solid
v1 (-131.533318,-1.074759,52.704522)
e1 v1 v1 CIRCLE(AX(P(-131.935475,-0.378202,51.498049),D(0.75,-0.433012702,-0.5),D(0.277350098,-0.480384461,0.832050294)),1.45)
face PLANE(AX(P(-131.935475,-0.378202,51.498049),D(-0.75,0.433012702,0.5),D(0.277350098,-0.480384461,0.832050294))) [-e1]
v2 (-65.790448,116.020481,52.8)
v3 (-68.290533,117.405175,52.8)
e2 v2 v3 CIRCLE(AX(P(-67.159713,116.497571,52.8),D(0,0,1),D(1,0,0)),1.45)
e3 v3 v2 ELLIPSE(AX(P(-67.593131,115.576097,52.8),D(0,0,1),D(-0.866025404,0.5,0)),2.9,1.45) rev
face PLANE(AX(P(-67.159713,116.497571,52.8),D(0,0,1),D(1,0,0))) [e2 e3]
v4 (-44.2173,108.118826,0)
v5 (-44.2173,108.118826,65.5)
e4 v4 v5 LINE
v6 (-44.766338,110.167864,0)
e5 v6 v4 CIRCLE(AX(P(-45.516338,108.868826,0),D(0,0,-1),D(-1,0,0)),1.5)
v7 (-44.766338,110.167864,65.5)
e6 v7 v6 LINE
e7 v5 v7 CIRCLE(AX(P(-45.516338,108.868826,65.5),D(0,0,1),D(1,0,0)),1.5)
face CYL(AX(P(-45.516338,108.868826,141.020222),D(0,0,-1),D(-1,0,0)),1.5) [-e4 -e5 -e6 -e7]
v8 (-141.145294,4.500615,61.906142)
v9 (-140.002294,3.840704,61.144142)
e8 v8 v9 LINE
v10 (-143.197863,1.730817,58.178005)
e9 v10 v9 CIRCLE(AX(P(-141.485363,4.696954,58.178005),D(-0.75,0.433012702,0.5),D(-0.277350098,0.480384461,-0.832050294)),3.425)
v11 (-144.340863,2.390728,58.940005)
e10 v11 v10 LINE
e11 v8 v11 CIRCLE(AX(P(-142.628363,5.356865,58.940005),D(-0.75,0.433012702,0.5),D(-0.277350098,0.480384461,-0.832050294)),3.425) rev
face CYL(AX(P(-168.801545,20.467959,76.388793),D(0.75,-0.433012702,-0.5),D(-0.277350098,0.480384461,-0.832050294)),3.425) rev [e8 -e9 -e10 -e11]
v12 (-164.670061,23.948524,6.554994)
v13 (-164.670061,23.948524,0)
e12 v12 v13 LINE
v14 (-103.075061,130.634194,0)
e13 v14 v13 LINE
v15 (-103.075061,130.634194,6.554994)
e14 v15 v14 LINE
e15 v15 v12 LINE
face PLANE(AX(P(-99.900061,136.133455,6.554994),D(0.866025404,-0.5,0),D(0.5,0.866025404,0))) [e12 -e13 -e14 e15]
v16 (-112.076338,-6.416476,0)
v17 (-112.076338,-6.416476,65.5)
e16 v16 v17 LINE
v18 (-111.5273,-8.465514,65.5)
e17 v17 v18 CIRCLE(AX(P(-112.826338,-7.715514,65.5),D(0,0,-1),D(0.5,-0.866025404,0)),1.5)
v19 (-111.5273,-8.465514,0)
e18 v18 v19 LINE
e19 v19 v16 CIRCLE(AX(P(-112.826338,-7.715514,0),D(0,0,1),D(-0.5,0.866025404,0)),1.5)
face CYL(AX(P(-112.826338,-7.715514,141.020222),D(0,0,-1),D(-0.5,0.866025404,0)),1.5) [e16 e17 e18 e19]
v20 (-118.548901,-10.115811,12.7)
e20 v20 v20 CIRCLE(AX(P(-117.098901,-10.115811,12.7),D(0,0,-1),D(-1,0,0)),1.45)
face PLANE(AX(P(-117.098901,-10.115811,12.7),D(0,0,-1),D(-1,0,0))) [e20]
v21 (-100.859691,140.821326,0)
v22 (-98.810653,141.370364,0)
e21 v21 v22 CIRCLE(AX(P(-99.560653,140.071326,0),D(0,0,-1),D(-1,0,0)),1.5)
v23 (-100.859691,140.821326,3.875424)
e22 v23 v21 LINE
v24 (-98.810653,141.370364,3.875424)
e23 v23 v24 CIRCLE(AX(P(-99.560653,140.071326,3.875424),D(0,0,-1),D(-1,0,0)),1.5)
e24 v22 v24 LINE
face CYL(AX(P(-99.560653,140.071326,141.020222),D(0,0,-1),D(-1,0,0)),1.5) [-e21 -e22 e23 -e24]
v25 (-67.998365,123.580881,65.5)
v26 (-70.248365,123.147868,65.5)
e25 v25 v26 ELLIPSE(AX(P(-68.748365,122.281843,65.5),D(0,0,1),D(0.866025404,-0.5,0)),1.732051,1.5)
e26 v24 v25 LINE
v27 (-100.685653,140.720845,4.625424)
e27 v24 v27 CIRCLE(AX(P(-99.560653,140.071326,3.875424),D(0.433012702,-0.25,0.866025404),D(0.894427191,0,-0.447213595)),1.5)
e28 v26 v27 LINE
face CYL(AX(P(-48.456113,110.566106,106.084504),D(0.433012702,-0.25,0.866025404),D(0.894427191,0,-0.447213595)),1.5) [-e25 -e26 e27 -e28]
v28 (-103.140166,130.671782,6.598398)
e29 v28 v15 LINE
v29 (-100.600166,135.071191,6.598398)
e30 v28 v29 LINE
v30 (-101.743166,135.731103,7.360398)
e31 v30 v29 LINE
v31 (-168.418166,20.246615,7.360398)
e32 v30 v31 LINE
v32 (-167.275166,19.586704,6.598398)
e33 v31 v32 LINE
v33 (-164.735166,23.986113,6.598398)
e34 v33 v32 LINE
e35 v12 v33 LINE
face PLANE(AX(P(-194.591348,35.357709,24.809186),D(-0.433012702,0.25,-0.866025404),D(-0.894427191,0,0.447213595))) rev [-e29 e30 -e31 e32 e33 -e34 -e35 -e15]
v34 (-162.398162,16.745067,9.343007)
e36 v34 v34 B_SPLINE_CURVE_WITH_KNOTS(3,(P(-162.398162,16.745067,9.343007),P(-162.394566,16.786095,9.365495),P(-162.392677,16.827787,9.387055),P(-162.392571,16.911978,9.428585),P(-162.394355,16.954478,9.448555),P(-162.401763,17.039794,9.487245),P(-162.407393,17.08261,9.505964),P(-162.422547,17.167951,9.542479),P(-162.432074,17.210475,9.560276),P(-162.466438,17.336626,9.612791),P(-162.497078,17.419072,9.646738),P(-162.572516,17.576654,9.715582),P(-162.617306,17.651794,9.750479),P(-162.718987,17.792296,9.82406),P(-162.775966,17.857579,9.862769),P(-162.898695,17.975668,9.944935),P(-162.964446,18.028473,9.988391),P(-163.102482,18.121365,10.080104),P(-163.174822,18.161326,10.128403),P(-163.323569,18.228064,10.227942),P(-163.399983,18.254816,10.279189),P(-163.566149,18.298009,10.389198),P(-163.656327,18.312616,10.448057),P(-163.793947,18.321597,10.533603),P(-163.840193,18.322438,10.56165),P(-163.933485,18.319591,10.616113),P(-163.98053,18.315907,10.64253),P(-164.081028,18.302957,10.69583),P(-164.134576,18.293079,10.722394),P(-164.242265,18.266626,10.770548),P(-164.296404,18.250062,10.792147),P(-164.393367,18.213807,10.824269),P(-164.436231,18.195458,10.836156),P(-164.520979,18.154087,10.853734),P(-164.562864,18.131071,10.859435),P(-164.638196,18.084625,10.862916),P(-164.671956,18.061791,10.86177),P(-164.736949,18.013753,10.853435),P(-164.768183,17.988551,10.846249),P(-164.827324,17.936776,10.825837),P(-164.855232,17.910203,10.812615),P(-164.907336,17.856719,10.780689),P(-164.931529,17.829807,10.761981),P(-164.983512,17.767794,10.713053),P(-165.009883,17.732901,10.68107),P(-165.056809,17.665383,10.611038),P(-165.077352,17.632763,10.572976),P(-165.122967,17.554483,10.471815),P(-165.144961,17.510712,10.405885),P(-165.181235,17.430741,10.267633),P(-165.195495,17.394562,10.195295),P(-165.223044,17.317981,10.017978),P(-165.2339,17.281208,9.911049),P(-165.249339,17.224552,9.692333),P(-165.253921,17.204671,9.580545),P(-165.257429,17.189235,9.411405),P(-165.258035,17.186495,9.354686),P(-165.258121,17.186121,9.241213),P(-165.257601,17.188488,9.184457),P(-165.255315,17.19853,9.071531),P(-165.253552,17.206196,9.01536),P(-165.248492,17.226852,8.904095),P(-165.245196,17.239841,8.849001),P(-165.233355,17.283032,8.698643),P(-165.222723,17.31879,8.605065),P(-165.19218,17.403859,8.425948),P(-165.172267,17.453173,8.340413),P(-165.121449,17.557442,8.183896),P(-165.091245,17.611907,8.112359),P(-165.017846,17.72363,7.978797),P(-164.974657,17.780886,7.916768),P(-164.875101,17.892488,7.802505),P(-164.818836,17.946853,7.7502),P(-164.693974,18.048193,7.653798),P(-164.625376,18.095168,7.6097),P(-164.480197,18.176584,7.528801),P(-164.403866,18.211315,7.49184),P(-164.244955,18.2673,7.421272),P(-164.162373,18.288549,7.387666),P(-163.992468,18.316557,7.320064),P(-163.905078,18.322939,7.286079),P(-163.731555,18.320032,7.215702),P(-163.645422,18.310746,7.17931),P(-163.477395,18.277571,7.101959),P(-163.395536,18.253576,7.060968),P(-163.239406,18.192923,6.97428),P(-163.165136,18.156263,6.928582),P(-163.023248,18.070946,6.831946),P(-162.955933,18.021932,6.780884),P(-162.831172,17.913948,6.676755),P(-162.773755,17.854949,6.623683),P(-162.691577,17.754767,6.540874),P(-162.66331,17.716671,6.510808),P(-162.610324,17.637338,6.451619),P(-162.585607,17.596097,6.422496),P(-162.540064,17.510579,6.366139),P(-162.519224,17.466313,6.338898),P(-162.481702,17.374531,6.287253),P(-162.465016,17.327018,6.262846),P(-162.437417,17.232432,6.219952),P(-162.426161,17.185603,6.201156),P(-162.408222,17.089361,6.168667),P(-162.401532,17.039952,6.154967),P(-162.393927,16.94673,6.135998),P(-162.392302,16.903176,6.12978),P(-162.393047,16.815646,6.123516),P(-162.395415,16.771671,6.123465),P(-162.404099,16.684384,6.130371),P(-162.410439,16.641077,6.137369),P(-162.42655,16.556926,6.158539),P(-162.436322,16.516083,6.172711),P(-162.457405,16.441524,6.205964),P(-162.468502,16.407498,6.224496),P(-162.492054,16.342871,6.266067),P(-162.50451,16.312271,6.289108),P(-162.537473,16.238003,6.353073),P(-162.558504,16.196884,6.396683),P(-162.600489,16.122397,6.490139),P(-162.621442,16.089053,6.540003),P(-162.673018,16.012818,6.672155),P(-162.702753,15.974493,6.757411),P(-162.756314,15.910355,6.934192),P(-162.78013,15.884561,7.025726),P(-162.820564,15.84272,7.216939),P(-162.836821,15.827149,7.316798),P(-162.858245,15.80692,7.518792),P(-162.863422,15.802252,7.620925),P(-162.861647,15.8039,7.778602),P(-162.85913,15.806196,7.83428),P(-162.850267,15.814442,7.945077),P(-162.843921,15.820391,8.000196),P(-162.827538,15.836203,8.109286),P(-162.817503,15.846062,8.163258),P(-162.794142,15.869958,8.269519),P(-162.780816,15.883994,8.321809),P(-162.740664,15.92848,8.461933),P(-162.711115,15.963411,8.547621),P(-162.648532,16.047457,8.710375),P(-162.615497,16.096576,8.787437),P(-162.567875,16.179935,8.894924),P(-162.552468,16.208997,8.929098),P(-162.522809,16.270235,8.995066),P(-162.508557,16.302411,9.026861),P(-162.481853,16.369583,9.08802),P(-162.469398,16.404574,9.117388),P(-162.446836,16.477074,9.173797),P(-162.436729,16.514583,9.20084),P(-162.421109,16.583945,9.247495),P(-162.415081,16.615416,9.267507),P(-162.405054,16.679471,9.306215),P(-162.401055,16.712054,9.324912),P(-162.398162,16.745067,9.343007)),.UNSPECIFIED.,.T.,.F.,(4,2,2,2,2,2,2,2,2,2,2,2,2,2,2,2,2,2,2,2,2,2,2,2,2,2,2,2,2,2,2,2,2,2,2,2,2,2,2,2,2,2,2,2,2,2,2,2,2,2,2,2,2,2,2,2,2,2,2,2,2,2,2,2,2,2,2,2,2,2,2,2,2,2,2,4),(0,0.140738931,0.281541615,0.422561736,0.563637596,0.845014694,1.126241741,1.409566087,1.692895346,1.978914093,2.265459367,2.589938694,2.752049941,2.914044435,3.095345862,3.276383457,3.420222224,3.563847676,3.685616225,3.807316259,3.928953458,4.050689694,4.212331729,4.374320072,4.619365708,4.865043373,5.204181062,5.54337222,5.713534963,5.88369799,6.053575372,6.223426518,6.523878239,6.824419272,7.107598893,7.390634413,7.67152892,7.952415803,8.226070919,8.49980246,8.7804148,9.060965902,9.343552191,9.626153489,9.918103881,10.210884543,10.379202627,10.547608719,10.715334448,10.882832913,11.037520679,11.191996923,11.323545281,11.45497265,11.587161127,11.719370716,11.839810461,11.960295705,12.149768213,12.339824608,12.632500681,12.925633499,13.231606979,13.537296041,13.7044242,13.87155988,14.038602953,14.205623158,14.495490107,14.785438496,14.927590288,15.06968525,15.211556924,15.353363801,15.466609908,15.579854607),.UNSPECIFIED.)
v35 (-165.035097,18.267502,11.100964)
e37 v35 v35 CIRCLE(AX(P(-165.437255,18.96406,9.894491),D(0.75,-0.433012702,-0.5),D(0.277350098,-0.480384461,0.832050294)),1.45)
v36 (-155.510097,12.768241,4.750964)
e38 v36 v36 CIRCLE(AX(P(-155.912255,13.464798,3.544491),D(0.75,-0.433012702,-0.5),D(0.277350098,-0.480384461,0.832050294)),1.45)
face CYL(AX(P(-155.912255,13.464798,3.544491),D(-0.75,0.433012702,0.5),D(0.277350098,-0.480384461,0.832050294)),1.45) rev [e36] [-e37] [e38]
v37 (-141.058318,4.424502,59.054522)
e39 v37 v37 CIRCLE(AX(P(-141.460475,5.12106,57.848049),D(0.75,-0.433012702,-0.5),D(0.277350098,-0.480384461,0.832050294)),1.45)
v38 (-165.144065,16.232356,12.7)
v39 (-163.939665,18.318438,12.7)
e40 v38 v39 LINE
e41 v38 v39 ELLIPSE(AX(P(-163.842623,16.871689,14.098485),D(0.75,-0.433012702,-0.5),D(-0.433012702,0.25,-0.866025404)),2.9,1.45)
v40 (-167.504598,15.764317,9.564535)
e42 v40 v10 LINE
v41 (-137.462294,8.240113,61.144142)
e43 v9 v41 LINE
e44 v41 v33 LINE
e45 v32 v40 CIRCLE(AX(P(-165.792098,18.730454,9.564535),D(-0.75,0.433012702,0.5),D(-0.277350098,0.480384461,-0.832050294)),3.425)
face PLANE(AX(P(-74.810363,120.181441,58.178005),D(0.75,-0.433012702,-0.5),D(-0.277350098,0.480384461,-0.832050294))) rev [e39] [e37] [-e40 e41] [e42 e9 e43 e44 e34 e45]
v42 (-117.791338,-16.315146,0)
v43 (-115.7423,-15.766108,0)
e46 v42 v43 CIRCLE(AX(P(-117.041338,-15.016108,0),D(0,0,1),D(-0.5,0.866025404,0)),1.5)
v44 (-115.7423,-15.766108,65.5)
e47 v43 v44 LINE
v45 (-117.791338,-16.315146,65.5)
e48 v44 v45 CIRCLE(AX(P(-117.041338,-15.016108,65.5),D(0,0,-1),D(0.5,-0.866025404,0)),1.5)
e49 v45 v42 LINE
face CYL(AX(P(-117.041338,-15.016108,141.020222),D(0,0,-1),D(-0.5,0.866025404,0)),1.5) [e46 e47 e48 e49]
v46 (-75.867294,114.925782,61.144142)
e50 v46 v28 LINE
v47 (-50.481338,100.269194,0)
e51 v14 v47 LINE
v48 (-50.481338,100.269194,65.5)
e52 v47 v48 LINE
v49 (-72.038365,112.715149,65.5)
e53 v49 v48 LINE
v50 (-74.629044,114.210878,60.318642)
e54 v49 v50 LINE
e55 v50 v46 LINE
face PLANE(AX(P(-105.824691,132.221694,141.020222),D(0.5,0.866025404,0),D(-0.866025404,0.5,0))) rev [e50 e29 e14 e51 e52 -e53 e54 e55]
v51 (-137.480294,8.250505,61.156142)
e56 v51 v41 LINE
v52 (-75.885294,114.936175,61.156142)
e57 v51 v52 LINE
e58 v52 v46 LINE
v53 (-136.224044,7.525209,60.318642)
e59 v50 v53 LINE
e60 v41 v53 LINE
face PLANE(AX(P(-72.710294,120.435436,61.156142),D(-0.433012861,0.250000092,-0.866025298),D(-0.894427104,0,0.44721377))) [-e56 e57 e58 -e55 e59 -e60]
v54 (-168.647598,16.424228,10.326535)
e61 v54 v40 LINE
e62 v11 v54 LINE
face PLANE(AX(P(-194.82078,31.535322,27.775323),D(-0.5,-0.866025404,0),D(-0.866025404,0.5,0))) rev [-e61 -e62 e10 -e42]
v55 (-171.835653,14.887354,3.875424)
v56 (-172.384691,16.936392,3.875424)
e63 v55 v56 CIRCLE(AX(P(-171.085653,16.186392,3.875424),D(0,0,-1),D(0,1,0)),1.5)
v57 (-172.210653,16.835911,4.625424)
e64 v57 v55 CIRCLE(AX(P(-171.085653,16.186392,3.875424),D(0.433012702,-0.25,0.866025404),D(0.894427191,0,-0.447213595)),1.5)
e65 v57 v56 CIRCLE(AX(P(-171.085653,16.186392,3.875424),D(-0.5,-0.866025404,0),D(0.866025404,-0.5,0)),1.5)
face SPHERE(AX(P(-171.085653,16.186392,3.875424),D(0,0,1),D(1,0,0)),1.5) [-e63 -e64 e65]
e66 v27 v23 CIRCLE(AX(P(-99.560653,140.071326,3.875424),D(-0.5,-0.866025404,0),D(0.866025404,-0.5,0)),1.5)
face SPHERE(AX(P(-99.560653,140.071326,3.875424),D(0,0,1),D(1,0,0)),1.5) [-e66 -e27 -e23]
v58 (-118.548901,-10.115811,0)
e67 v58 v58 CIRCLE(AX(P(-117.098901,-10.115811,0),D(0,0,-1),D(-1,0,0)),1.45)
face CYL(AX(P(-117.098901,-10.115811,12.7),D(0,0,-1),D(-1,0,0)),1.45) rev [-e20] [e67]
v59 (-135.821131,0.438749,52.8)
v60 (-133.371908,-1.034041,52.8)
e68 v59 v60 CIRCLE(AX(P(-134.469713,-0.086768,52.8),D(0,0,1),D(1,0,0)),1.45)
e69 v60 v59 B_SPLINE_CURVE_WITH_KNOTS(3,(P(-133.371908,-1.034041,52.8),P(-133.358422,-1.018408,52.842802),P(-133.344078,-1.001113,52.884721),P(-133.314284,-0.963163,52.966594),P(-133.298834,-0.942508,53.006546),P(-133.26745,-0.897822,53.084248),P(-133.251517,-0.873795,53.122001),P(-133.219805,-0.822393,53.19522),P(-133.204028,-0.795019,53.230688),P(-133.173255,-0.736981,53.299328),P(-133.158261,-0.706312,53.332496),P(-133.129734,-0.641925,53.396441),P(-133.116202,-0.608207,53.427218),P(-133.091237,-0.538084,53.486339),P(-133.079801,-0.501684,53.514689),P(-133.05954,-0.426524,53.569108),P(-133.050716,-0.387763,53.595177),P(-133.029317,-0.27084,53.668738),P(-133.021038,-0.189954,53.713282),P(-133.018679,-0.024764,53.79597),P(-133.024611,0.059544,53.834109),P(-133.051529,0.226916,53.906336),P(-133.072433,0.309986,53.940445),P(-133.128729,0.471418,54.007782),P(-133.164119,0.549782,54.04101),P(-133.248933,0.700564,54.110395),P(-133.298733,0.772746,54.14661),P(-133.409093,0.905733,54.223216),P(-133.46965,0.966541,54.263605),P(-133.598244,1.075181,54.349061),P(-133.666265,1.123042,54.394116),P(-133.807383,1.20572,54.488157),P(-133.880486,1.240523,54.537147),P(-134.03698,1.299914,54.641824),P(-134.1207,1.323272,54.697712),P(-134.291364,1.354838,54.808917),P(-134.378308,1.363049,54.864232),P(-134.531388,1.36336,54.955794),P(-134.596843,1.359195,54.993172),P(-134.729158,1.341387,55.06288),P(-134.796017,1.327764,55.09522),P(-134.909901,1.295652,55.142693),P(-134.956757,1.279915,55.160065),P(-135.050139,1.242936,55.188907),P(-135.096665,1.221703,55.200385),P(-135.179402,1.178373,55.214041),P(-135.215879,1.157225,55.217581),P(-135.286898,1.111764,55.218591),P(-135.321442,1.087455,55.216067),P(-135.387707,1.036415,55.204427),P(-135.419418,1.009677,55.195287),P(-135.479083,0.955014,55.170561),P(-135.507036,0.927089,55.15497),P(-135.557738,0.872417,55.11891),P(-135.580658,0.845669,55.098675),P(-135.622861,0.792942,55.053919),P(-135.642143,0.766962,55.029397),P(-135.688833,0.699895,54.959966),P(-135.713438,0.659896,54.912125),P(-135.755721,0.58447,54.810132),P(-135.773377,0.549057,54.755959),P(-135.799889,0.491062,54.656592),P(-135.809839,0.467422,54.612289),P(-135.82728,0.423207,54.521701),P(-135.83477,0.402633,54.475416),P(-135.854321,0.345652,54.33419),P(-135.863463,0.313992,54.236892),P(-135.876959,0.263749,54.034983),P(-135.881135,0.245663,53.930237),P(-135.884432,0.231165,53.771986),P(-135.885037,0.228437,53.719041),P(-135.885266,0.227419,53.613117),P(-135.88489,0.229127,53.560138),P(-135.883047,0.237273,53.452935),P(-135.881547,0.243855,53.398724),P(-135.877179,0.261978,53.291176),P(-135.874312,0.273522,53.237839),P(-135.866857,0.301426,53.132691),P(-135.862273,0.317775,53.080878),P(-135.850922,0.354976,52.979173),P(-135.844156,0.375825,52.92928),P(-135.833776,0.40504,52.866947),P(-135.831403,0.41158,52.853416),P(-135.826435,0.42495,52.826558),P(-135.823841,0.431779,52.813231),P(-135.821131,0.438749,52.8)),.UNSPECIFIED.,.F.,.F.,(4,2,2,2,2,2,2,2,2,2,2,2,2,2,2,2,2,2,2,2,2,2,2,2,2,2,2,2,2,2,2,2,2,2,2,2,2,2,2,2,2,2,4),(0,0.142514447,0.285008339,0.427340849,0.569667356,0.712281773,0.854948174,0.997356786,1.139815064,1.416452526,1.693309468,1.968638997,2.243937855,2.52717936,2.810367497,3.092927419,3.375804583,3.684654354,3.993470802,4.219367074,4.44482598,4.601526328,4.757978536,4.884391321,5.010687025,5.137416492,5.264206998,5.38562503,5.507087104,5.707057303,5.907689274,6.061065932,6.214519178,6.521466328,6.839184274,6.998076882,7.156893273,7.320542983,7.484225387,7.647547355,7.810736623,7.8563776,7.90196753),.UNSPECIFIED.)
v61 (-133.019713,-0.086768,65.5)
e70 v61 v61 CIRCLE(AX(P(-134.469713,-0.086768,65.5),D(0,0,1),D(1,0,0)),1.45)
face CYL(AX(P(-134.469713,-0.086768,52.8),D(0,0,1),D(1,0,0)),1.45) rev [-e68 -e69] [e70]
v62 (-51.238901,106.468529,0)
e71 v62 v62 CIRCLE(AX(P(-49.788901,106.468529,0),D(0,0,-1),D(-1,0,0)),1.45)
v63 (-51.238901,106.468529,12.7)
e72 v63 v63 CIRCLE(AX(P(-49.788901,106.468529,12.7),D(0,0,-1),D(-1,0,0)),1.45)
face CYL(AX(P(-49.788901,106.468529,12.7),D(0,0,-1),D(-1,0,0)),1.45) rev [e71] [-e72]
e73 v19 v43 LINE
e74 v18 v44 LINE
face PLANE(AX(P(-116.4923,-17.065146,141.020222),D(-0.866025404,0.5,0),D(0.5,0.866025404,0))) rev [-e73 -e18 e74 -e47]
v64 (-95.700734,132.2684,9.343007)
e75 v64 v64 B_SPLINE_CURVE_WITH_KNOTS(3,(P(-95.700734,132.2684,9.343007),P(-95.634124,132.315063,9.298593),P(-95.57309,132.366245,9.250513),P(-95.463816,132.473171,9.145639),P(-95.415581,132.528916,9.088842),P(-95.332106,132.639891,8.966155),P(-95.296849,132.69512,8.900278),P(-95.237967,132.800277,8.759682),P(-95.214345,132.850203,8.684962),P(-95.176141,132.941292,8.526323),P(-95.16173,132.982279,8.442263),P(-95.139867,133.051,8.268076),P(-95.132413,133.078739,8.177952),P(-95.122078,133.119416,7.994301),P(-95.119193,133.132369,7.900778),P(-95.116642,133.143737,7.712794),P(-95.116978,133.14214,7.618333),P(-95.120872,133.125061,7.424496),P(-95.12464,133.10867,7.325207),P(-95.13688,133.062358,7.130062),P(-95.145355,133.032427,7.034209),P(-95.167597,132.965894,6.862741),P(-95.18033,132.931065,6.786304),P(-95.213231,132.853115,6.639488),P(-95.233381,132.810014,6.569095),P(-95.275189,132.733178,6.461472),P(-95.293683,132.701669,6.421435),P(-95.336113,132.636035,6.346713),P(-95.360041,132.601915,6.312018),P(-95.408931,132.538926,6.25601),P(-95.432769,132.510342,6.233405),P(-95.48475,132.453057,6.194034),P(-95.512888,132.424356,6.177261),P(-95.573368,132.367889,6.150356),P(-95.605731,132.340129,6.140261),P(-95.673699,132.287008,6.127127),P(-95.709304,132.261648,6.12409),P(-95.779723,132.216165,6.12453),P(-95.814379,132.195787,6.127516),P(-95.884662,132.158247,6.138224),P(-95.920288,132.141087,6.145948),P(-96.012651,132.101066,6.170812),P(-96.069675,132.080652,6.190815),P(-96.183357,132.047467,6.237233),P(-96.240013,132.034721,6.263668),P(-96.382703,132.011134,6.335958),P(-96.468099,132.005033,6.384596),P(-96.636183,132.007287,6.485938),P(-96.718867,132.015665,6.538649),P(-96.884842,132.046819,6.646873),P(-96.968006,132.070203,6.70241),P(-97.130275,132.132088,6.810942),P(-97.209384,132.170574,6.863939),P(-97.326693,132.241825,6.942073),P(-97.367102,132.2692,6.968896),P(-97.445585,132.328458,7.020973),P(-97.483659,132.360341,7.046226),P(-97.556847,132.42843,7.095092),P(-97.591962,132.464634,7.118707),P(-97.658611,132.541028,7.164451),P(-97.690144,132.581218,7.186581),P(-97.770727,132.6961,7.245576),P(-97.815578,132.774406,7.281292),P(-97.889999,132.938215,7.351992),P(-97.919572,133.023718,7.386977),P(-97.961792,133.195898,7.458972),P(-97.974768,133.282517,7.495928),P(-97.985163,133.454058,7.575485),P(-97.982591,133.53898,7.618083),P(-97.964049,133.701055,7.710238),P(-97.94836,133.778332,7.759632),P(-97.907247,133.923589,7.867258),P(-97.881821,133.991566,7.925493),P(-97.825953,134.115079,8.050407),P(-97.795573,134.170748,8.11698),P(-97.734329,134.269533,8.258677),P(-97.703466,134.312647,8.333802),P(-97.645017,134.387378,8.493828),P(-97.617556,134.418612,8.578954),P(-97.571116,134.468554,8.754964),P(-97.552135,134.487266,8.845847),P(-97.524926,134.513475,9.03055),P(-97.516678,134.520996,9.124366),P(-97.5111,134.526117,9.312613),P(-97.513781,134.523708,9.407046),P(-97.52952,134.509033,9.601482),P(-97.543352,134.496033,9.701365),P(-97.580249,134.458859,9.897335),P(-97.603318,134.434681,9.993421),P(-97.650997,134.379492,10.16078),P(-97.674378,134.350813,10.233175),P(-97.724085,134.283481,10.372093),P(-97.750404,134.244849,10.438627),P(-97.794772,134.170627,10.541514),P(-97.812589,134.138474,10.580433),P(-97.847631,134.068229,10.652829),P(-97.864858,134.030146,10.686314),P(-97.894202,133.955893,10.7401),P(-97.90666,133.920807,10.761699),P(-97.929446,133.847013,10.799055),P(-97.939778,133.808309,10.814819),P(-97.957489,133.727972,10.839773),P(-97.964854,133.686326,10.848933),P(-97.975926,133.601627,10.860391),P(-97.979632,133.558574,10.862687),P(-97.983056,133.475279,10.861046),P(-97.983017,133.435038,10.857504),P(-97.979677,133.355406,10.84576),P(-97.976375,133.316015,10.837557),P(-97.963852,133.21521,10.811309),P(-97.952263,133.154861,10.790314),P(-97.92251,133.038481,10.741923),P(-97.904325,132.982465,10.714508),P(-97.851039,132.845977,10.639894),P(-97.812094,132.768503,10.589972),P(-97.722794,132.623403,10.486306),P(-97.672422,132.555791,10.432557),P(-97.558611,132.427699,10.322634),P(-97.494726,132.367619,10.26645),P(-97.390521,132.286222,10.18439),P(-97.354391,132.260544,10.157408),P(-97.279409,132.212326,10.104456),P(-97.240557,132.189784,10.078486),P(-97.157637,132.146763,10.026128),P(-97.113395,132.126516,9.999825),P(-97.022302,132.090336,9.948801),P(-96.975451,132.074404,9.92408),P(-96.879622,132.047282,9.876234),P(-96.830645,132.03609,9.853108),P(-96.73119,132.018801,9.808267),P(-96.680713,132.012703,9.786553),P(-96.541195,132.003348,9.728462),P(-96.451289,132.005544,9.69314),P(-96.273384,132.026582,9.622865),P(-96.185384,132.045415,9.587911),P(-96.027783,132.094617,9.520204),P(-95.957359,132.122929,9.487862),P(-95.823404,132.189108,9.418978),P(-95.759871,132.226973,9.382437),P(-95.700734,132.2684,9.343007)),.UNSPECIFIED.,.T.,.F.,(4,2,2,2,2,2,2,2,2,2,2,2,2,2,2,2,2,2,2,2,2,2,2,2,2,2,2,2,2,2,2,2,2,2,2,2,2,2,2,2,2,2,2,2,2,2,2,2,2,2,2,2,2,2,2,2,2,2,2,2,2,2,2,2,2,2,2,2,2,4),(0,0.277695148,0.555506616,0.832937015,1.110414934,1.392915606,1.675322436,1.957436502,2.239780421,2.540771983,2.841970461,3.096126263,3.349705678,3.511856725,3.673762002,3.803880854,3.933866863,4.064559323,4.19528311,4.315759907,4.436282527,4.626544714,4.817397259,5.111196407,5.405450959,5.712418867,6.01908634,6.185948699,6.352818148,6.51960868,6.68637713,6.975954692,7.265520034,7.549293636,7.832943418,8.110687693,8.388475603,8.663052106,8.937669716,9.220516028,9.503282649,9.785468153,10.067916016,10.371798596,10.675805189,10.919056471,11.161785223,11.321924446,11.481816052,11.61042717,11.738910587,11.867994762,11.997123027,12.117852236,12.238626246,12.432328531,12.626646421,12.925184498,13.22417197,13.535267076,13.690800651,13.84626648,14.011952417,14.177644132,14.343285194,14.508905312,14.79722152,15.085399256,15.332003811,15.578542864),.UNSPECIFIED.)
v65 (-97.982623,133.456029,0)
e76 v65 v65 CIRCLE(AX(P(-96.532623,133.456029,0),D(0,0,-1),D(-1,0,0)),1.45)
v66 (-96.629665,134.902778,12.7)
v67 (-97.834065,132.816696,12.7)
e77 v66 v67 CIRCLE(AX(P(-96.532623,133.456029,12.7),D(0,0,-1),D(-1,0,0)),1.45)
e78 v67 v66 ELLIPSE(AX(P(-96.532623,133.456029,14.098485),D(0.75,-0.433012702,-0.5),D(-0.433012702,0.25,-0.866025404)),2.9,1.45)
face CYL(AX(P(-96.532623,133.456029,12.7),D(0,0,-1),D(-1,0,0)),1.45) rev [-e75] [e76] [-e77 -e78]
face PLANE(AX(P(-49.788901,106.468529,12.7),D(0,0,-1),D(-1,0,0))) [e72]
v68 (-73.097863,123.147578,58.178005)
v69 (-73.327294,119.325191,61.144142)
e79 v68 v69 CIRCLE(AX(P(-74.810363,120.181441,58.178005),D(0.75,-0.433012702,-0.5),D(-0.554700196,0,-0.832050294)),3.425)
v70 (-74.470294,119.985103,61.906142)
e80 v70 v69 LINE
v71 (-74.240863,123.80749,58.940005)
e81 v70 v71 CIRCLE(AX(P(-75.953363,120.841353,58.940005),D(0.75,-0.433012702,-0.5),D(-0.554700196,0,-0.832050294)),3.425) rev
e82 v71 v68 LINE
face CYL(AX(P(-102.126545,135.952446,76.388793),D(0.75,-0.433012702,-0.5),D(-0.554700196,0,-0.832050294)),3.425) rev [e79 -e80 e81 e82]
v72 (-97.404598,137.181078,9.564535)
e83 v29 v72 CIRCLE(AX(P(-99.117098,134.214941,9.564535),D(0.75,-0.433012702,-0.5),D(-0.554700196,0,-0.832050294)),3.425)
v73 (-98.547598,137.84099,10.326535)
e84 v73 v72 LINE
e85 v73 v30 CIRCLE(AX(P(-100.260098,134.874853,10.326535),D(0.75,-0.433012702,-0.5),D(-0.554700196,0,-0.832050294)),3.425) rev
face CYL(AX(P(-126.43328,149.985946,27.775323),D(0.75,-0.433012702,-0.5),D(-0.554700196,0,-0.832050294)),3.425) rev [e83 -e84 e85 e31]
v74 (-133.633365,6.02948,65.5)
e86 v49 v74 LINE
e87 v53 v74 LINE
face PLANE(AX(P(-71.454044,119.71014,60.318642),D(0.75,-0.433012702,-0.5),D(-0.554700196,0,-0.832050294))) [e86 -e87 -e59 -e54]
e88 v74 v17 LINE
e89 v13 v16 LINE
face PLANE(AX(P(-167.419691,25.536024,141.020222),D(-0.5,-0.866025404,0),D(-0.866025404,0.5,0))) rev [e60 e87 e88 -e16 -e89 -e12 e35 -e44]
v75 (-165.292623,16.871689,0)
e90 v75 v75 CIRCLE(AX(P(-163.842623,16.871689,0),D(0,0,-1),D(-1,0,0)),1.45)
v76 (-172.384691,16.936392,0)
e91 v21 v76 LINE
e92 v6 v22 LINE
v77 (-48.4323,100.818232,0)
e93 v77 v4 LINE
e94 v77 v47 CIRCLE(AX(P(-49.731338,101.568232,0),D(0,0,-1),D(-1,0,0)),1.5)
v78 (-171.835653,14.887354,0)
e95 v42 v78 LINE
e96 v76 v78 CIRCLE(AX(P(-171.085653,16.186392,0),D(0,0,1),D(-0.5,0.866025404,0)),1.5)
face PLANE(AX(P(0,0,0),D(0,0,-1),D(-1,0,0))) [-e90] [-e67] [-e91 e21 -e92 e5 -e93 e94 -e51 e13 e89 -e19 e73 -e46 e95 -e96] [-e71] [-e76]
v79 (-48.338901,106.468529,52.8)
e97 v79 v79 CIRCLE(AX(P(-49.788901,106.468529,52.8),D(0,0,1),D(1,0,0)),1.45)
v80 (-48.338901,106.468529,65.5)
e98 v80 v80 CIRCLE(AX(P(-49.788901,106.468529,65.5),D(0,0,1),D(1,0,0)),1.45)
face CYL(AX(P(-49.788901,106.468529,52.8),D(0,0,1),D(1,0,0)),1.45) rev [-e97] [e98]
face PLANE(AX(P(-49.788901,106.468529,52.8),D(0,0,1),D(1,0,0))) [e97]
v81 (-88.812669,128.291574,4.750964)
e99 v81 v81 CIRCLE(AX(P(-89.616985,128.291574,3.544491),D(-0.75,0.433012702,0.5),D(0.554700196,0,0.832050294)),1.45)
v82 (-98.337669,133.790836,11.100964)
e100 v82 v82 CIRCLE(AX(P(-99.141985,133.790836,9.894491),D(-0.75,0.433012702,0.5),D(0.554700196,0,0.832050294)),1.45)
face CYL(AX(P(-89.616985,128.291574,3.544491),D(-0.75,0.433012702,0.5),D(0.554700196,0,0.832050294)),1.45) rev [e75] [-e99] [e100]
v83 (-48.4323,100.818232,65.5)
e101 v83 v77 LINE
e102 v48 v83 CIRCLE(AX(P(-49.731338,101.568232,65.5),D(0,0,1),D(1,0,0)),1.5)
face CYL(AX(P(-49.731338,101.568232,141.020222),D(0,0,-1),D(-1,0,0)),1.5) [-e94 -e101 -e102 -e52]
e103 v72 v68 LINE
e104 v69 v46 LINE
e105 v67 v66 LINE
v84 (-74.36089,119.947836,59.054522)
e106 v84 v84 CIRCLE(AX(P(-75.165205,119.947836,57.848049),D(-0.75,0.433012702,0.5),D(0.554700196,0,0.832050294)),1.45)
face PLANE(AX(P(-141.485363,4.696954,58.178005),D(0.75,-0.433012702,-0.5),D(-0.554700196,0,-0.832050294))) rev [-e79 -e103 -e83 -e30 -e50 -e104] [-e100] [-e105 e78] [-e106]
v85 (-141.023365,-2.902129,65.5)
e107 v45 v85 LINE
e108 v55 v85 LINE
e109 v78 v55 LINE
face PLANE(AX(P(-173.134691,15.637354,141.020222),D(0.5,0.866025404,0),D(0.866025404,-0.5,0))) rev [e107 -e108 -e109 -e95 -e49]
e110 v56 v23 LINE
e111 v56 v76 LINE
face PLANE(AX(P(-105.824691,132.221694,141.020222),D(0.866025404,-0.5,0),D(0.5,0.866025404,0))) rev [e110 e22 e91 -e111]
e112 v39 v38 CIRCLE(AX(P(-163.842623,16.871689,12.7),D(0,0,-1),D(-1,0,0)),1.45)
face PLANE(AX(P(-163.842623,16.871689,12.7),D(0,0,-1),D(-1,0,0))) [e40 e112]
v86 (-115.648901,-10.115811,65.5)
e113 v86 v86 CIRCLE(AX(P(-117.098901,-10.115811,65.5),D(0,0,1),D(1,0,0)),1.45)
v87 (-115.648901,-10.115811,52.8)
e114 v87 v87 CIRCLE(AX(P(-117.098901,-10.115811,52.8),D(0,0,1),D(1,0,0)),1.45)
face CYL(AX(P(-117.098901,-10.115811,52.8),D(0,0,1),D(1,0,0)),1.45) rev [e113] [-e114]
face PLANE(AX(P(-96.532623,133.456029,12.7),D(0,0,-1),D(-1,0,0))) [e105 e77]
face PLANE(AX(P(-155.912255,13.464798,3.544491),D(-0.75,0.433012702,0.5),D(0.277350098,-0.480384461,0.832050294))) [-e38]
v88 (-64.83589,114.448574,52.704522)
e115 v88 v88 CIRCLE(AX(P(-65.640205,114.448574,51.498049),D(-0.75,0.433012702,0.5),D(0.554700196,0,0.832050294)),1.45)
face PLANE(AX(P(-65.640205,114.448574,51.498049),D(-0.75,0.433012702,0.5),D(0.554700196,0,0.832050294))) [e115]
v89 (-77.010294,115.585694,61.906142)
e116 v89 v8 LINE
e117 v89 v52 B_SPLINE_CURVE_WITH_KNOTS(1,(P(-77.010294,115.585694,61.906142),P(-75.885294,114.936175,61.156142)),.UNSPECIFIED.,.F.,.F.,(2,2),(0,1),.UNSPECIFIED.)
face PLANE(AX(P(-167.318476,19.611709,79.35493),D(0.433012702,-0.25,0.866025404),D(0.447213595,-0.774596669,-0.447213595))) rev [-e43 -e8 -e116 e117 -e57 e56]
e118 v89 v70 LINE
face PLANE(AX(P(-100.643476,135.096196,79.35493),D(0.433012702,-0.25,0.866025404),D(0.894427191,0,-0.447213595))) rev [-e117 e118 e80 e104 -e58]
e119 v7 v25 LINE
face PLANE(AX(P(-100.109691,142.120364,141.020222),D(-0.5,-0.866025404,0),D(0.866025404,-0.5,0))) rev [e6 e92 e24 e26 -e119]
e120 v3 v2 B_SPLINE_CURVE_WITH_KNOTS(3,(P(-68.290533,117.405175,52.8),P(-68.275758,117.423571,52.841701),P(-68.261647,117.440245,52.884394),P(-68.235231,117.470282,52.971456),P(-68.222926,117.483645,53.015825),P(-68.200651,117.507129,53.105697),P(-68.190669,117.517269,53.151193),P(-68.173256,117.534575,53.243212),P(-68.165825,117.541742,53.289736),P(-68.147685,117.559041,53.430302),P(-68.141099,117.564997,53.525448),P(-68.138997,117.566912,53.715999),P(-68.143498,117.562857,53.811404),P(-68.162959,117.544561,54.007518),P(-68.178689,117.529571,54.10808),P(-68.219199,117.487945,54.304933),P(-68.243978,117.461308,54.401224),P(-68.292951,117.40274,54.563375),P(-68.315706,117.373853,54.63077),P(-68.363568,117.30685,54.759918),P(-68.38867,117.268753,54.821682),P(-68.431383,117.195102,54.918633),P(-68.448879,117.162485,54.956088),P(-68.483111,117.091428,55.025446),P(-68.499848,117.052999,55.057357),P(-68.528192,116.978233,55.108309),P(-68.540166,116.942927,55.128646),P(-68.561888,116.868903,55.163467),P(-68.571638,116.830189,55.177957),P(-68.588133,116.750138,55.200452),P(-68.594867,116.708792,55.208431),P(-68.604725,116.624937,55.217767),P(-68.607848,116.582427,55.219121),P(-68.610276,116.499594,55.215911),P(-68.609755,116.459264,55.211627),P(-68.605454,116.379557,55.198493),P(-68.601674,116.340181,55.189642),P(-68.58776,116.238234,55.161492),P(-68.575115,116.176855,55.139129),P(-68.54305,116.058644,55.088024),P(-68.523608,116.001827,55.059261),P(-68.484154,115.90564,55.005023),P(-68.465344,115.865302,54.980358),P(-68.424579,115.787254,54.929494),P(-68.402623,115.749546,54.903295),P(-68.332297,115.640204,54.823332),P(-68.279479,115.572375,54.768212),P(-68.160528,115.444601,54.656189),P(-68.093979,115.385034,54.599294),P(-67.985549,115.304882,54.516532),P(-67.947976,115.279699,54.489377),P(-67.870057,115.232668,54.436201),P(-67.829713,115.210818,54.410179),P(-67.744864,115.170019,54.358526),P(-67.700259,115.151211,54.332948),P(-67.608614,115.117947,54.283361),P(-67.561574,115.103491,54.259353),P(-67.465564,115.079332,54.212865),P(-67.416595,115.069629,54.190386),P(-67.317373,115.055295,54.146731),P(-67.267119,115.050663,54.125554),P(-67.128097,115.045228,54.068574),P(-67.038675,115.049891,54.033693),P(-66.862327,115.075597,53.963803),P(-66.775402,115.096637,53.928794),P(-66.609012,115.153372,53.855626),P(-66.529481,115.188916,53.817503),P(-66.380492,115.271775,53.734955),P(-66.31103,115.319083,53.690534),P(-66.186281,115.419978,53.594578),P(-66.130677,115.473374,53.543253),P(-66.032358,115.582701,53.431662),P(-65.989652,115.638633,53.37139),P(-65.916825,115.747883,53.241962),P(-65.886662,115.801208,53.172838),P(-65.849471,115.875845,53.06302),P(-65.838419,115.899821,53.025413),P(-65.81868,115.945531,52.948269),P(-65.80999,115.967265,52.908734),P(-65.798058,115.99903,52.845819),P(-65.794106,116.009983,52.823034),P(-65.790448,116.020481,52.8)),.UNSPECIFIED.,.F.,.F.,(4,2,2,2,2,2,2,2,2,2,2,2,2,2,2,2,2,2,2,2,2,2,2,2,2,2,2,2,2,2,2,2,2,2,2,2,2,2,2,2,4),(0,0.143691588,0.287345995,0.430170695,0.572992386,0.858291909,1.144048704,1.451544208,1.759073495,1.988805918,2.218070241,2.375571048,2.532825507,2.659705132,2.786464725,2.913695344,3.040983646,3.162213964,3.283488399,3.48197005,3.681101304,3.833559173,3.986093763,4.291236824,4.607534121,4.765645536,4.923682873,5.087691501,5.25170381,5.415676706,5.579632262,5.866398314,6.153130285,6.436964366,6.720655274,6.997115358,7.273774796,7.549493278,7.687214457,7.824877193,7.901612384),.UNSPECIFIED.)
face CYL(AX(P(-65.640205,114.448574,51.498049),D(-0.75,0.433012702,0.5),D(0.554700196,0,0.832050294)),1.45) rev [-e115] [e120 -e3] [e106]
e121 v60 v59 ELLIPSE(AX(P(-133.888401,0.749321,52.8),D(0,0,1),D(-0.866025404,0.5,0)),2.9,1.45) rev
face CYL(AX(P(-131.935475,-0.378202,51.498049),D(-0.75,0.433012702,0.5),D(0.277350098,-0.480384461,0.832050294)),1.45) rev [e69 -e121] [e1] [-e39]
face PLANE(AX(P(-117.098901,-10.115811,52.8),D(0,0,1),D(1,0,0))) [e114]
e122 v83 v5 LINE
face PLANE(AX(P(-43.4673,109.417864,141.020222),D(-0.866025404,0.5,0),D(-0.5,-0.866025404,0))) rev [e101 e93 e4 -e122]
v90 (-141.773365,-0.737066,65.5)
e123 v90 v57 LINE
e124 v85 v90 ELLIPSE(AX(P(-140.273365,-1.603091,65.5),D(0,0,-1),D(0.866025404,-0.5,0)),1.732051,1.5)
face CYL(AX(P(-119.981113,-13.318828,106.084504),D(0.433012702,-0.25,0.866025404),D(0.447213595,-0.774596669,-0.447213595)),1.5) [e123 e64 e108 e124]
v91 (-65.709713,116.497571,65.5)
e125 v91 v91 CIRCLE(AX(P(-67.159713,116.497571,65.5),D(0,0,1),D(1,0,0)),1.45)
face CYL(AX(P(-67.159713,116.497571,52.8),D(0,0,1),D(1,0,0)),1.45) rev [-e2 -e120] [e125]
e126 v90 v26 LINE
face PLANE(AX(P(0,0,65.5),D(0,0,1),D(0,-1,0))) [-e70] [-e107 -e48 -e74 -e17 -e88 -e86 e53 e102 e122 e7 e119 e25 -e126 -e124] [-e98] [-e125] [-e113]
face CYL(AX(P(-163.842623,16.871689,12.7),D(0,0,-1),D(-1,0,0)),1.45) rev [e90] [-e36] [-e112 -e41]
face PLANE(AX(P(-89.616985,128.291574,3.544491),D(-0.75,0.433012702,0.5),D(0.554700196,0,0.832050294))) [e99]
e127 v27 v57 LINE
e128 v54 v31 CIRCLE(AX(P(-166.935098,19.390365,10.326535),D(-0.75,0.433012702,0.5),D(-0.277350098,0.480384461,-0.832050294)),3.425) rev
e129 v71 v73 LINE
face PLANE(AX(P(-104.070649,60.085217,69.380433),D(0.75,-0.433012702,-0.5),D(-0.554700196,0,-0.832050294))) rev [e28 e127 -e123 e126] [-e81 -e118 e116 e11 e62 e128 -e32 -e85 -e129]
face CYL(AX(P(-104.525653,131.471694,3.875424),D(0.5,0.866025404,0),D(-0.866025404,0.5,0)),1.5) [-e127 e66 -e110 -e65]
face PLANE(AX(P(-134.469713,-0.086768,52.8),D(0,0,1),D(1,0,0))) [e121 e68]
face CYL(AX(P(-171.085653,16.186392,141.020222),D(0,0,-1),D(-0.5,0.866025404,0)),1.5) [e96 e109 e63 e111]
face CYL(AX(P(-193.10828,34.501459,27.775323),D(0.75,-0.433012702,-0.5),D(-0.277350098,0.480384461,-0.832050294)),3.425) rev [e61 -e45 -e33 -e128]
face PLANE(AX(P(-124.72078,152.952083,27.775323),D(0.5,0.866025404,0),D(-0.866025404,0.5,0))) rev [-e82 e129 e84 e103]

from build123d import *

# Parameters (mm, degrees)
BOSS_EXTRUDE1_DEPTH      = 65.5
CUT_EXTRUDE1_DEPTH       = 123.81081001013399
SKETCH5_W                = 286.8159556552996
SKETCH5_H                = 274.5057689508883
CUT_EXTRUDE2_DEPTH       = 124.35386359594037
FILLET1_R                = 1.5
SKETCH6_R                = 1.4499999999976838
SKETCH6_R_2              = 1.4499999999976672
CUT_EXTRUDE3_DEPTH       = 12.7
FILLET2_R                = 1.5
BOSS_EXTRUDE2_DEPTH      = 129.03199999999995
BOSS_EXTRUDE2_DEPTH_BACK = 6.35
FILLET3_R                = 1.5
SKETCH9_R                = 1.4499999999972695
SKETCH9_R_2              = 1.450000000000002
SKETCH9_R_3              = 1.44999999999727
SKETCH9_R_4              = 1.4500000000000004
CUT_EXTRUDE4_DEPTH       = 12.7
CUT_EXTRUDE5_START       = -12.7
SKETCH12_R               = 1.4500000000000008
SKETCH12_R_2             = 1.4499999999999993
SKETCH12_R_3             = 1.450000000000002
CUT_EXTRUDE5_DEPTH       = 12.7


with BuildPart() as part:
    # Sketch2 → Boss-Extrude1 (new body)
    with BuildSketch(Plane.XY):
        Polygon((-105.82469127018673, 132.22169365322222), (-100.10969127018673, 142.12036401847837), (-43.467299735665506, 109.41786401847837), (-49.1822997356655, 99.51919365322226), align=None)
    extrude(amount=BOSS_EXTRUDE1_DEPTH)

    # Sketch4 → Cut-Extrude1 (cut, through all)
    with BuildSketch(Plane(origin=(-102.92764878057318, 59.4253057305198, 68.61843252038122), x_dir=(-0.43301270189221336, 0.2499999999999988, -0.866025403784442), z_dir=(0.750000000000001, -0.4330127018922244, -0.4999999999999942))):
        with BuildLine():
            Line((12.055567275641103, -70.09999999999997), (68.18956727564095, -70.09999999999998))
            ThreePointArc((68.18956727564095, -70.09999999999998), (70.61140800120485, -69.0968407255639), (71.61456727564105, -66.675))
            Line((71.61456727564105, -66.675), (71.61456727564108, 66.67500000000005))
            ThreePointArc((71.61456727564108, 66.67500000000005), (70.611408001205, 69.096840725564), (68.18956727564107, 70.10000000000008))
            Line((68.18956727564107, 70.10000000000008), (12.055567275641172, 70.10000000000008))
            ThreePointArc((12.055567275641172, 70.10000000000008), (9.63372655007727, 69.096840725564), (8.630567275641152, 66.67500000000008))
            Line((8.630567275641152, 66.67500000000008), (8.630567275641091, -66.67499999999998))
            ThreePointArc((8.630567275641091, -66.67499999999998), (9.633726550077167, -69.09684072556392), (12.055567275641103, -70.09999999999997))
        make_face()
    extrude(amount=-CUT_EXTRUDE1_DEPTH, mode=Mode.SUBTRACT)

    # Sketch5 → Cut-Extrude2 (cut, through all)
    with BuildSketch(Plane(origin=(-104.07064878057318, 60.08521708820357, 69.38043252038125), x_dir=(0.43301270189221336, -0.2499999999999988, 0.866025403784442), z_dir=(-0.750000000000001, 0.43301270189222446, 0.4999999999999942))):
        with Locations((-47.42628955617079, -22.345577128817233)):
            Rectangle(SKETCH5_W, SKETCH5_H)
    extrude(amount=CUT_EXTRUDE2_DEPTH, mode=Mode.SUBTRACT)

    # Fillet1
    fillet1_edges = [part.edges().sort_by_distance(p)[0] for p in [
        (-43.467299735665506, 109.41786401847837, 32.75),
        (-84.80402815547504, 133.28363529907386, 34.88867377057616),
        (-76.11182953811208, 115.06696493381483, 63.70307100530266),
        (-49.1822997356655, 99.51919365322226, 32.75),
    ]]
    fillet(fillet1_edges, radius=FILLET1_R)

    # Sketch6 → Cut-Extrude3 (cut)
    with BuildSketch(Plane(origin=(-102.92764878057321, 59.42530573051982, 68.61843252038126), x_dir=(0.4330127018922132, -0.24999999999999897, 0.866025403784442), z_dir=(-0.750000000000001, 0.4330127018922244, 0.4999999999999942))):
        with Locations(Location((-12.4365672756387, 66.29527000000009, 0), (0, 0, 16.102113752))):
            Circle(SKETCH6_R)
        with Locations(Location((-67.80856727563872, 66.29527000000007, 0), (0, 0, 16.102113752))):
            Circle(SKETCH6_R_2)
    extrude(amount=-CUT_EXTRUDE3_DEPTH, mode=Mode.SUBTRACT)

    # Fillet2
    # the kernel refuses this fillet: 1.5 mm, written as the material it takes off along each edge
    with BuildSketch(Plane(origin=(-100.10969127018673, 142.12036401847837, -3.75), x_dir=(-0.5, -0.8660254037844387, 0), z_dir=(0, 0, 1))) as fillet2_piece_1:
        with BuildLine():
            CenterArc((FILLET2_R, FILLET2_R), FILLET2_R, 180, 90)
            Line((3e-17, FILLET2_R), (0, 0))
            Line((0, 0), (FILLET2_R, 0))
        make_face()
    extrude(amount=8.777347541152302, mode=Mode.SUBTRACT)


with BuildPart() as body_2:
    # Mirror2: mirrored copy
    add(part.part.mirror(Plane(origin=(0, 0, 0), x_dir=(1e-16, 1.8e-16, 1), z_dir=(0.500000000000004, 0.8660254037844364, 0))))


with BuildPart() as part_1:
    add(part.part)

    add(body_2.part)  # Boss-Extrude2 merges body 2
    # Sketch8 → Boss-Extrude2 (add, two sides: drawn at the far end of the back side and taken through both)
    with BuildSketch(Plane(origin=(30.797500000000397, 53.34283474610328, 0), x_dir=(0.866025403784437, -0.5000000000000029, 0), z_dir=(-0.5000000000000029, -0.866025403784437, 0)).offset(-BOSS_EXTRUDE2_DEPTH_BACK)):
        Polygon((-154.5827178142381, 6.554994353133541), (-155.97771781422597, 7.360397978646052), (-157.7577178142381, 4.277347541152373), (-157.7577178142381, 0), (-154.58271781423835, 0), align=None)
        Polygon((-123.18667970854972, 61.15614201060529), (-121.73608733433291, 60.31864170382078), (-118.74462872726596, 65.50000000000001), (-120.67875212905116, 65.50000000000001), (-122.41080293662007, 65.50000000000001), (-124.48571781422638, 61.90614201060528), align=None)
    extrude(amount=BOSS_EXTRUDE2_DEPTH + BOSS_EXTRUDE2_DEPTH_BACK)

    # Fillet3
    fillet3_edges = [part_1.edges().sort_by_distance(p)[0] for p in [
        (-172.53112429253738, 15.785626111925975, 4.1571540602531725),
        (-136.62219127018705, 78.87885890711985, 4.277347541152341),
        (-99.93631537383828, 141.5235235248658, 4.157154060253142),
    ]]
    fillet(fillet3_edges, radius=FILLET3_R)

    # Sketch9 → Cut-Extrude4 (cut)
    with BuildSketch(Plane.XY.offset(65.50000000000001)):
        with Locations((-67.1597126180574, 116.49757139704164)):
            Circle(SKETCH9_R)
        with Locations((-49.7889013508033, 106.4685288358503)):
            Circle(SKETCH9_R_2)
        with Locations((-134.46971261805777, -0.08676846042013409)):
            Circle(SKETCH9_R_3)
        with Locations((-117.0989013508037, -10.115811021611455)):
            Circle(SKETCH9_R_4)
    extrude(amount=-CUT_EXTRUDE4_DEPTH, mode=Mode.SUBTRACT)

    # Sketch12 → Cut-Extrude5 (cut)
    with BuildSketch(Plane(origin=(0, 0, 0), x_dir=(-1, 0, 0), z_dir=(0, 0, -1)).offset(CUT_EXTRUDE5_START)):
        with Locations((163.84262252006926, 16.871688978388832)):
            Circle(SKETCH12_R)
        with Locations(Location((117.09890135080418, -10.115811021611187, 0), (0, 0, 180))):
            Circle(SKETCH12_R_2)
        with Locations((96.53262252006812, 133.4560288358508)):
            Circle(SKETCH12_R_3)
        with Locations(Location((49.78890135080324, 106.46852883585038, 0), (0, 0, 180))):
            Circle(SKETCH12_R_3)
    extrude(amount=CUT_EXTRUDE5_DEPTH, mode=Mode.SUBTRACT)


solid = part_1.part
